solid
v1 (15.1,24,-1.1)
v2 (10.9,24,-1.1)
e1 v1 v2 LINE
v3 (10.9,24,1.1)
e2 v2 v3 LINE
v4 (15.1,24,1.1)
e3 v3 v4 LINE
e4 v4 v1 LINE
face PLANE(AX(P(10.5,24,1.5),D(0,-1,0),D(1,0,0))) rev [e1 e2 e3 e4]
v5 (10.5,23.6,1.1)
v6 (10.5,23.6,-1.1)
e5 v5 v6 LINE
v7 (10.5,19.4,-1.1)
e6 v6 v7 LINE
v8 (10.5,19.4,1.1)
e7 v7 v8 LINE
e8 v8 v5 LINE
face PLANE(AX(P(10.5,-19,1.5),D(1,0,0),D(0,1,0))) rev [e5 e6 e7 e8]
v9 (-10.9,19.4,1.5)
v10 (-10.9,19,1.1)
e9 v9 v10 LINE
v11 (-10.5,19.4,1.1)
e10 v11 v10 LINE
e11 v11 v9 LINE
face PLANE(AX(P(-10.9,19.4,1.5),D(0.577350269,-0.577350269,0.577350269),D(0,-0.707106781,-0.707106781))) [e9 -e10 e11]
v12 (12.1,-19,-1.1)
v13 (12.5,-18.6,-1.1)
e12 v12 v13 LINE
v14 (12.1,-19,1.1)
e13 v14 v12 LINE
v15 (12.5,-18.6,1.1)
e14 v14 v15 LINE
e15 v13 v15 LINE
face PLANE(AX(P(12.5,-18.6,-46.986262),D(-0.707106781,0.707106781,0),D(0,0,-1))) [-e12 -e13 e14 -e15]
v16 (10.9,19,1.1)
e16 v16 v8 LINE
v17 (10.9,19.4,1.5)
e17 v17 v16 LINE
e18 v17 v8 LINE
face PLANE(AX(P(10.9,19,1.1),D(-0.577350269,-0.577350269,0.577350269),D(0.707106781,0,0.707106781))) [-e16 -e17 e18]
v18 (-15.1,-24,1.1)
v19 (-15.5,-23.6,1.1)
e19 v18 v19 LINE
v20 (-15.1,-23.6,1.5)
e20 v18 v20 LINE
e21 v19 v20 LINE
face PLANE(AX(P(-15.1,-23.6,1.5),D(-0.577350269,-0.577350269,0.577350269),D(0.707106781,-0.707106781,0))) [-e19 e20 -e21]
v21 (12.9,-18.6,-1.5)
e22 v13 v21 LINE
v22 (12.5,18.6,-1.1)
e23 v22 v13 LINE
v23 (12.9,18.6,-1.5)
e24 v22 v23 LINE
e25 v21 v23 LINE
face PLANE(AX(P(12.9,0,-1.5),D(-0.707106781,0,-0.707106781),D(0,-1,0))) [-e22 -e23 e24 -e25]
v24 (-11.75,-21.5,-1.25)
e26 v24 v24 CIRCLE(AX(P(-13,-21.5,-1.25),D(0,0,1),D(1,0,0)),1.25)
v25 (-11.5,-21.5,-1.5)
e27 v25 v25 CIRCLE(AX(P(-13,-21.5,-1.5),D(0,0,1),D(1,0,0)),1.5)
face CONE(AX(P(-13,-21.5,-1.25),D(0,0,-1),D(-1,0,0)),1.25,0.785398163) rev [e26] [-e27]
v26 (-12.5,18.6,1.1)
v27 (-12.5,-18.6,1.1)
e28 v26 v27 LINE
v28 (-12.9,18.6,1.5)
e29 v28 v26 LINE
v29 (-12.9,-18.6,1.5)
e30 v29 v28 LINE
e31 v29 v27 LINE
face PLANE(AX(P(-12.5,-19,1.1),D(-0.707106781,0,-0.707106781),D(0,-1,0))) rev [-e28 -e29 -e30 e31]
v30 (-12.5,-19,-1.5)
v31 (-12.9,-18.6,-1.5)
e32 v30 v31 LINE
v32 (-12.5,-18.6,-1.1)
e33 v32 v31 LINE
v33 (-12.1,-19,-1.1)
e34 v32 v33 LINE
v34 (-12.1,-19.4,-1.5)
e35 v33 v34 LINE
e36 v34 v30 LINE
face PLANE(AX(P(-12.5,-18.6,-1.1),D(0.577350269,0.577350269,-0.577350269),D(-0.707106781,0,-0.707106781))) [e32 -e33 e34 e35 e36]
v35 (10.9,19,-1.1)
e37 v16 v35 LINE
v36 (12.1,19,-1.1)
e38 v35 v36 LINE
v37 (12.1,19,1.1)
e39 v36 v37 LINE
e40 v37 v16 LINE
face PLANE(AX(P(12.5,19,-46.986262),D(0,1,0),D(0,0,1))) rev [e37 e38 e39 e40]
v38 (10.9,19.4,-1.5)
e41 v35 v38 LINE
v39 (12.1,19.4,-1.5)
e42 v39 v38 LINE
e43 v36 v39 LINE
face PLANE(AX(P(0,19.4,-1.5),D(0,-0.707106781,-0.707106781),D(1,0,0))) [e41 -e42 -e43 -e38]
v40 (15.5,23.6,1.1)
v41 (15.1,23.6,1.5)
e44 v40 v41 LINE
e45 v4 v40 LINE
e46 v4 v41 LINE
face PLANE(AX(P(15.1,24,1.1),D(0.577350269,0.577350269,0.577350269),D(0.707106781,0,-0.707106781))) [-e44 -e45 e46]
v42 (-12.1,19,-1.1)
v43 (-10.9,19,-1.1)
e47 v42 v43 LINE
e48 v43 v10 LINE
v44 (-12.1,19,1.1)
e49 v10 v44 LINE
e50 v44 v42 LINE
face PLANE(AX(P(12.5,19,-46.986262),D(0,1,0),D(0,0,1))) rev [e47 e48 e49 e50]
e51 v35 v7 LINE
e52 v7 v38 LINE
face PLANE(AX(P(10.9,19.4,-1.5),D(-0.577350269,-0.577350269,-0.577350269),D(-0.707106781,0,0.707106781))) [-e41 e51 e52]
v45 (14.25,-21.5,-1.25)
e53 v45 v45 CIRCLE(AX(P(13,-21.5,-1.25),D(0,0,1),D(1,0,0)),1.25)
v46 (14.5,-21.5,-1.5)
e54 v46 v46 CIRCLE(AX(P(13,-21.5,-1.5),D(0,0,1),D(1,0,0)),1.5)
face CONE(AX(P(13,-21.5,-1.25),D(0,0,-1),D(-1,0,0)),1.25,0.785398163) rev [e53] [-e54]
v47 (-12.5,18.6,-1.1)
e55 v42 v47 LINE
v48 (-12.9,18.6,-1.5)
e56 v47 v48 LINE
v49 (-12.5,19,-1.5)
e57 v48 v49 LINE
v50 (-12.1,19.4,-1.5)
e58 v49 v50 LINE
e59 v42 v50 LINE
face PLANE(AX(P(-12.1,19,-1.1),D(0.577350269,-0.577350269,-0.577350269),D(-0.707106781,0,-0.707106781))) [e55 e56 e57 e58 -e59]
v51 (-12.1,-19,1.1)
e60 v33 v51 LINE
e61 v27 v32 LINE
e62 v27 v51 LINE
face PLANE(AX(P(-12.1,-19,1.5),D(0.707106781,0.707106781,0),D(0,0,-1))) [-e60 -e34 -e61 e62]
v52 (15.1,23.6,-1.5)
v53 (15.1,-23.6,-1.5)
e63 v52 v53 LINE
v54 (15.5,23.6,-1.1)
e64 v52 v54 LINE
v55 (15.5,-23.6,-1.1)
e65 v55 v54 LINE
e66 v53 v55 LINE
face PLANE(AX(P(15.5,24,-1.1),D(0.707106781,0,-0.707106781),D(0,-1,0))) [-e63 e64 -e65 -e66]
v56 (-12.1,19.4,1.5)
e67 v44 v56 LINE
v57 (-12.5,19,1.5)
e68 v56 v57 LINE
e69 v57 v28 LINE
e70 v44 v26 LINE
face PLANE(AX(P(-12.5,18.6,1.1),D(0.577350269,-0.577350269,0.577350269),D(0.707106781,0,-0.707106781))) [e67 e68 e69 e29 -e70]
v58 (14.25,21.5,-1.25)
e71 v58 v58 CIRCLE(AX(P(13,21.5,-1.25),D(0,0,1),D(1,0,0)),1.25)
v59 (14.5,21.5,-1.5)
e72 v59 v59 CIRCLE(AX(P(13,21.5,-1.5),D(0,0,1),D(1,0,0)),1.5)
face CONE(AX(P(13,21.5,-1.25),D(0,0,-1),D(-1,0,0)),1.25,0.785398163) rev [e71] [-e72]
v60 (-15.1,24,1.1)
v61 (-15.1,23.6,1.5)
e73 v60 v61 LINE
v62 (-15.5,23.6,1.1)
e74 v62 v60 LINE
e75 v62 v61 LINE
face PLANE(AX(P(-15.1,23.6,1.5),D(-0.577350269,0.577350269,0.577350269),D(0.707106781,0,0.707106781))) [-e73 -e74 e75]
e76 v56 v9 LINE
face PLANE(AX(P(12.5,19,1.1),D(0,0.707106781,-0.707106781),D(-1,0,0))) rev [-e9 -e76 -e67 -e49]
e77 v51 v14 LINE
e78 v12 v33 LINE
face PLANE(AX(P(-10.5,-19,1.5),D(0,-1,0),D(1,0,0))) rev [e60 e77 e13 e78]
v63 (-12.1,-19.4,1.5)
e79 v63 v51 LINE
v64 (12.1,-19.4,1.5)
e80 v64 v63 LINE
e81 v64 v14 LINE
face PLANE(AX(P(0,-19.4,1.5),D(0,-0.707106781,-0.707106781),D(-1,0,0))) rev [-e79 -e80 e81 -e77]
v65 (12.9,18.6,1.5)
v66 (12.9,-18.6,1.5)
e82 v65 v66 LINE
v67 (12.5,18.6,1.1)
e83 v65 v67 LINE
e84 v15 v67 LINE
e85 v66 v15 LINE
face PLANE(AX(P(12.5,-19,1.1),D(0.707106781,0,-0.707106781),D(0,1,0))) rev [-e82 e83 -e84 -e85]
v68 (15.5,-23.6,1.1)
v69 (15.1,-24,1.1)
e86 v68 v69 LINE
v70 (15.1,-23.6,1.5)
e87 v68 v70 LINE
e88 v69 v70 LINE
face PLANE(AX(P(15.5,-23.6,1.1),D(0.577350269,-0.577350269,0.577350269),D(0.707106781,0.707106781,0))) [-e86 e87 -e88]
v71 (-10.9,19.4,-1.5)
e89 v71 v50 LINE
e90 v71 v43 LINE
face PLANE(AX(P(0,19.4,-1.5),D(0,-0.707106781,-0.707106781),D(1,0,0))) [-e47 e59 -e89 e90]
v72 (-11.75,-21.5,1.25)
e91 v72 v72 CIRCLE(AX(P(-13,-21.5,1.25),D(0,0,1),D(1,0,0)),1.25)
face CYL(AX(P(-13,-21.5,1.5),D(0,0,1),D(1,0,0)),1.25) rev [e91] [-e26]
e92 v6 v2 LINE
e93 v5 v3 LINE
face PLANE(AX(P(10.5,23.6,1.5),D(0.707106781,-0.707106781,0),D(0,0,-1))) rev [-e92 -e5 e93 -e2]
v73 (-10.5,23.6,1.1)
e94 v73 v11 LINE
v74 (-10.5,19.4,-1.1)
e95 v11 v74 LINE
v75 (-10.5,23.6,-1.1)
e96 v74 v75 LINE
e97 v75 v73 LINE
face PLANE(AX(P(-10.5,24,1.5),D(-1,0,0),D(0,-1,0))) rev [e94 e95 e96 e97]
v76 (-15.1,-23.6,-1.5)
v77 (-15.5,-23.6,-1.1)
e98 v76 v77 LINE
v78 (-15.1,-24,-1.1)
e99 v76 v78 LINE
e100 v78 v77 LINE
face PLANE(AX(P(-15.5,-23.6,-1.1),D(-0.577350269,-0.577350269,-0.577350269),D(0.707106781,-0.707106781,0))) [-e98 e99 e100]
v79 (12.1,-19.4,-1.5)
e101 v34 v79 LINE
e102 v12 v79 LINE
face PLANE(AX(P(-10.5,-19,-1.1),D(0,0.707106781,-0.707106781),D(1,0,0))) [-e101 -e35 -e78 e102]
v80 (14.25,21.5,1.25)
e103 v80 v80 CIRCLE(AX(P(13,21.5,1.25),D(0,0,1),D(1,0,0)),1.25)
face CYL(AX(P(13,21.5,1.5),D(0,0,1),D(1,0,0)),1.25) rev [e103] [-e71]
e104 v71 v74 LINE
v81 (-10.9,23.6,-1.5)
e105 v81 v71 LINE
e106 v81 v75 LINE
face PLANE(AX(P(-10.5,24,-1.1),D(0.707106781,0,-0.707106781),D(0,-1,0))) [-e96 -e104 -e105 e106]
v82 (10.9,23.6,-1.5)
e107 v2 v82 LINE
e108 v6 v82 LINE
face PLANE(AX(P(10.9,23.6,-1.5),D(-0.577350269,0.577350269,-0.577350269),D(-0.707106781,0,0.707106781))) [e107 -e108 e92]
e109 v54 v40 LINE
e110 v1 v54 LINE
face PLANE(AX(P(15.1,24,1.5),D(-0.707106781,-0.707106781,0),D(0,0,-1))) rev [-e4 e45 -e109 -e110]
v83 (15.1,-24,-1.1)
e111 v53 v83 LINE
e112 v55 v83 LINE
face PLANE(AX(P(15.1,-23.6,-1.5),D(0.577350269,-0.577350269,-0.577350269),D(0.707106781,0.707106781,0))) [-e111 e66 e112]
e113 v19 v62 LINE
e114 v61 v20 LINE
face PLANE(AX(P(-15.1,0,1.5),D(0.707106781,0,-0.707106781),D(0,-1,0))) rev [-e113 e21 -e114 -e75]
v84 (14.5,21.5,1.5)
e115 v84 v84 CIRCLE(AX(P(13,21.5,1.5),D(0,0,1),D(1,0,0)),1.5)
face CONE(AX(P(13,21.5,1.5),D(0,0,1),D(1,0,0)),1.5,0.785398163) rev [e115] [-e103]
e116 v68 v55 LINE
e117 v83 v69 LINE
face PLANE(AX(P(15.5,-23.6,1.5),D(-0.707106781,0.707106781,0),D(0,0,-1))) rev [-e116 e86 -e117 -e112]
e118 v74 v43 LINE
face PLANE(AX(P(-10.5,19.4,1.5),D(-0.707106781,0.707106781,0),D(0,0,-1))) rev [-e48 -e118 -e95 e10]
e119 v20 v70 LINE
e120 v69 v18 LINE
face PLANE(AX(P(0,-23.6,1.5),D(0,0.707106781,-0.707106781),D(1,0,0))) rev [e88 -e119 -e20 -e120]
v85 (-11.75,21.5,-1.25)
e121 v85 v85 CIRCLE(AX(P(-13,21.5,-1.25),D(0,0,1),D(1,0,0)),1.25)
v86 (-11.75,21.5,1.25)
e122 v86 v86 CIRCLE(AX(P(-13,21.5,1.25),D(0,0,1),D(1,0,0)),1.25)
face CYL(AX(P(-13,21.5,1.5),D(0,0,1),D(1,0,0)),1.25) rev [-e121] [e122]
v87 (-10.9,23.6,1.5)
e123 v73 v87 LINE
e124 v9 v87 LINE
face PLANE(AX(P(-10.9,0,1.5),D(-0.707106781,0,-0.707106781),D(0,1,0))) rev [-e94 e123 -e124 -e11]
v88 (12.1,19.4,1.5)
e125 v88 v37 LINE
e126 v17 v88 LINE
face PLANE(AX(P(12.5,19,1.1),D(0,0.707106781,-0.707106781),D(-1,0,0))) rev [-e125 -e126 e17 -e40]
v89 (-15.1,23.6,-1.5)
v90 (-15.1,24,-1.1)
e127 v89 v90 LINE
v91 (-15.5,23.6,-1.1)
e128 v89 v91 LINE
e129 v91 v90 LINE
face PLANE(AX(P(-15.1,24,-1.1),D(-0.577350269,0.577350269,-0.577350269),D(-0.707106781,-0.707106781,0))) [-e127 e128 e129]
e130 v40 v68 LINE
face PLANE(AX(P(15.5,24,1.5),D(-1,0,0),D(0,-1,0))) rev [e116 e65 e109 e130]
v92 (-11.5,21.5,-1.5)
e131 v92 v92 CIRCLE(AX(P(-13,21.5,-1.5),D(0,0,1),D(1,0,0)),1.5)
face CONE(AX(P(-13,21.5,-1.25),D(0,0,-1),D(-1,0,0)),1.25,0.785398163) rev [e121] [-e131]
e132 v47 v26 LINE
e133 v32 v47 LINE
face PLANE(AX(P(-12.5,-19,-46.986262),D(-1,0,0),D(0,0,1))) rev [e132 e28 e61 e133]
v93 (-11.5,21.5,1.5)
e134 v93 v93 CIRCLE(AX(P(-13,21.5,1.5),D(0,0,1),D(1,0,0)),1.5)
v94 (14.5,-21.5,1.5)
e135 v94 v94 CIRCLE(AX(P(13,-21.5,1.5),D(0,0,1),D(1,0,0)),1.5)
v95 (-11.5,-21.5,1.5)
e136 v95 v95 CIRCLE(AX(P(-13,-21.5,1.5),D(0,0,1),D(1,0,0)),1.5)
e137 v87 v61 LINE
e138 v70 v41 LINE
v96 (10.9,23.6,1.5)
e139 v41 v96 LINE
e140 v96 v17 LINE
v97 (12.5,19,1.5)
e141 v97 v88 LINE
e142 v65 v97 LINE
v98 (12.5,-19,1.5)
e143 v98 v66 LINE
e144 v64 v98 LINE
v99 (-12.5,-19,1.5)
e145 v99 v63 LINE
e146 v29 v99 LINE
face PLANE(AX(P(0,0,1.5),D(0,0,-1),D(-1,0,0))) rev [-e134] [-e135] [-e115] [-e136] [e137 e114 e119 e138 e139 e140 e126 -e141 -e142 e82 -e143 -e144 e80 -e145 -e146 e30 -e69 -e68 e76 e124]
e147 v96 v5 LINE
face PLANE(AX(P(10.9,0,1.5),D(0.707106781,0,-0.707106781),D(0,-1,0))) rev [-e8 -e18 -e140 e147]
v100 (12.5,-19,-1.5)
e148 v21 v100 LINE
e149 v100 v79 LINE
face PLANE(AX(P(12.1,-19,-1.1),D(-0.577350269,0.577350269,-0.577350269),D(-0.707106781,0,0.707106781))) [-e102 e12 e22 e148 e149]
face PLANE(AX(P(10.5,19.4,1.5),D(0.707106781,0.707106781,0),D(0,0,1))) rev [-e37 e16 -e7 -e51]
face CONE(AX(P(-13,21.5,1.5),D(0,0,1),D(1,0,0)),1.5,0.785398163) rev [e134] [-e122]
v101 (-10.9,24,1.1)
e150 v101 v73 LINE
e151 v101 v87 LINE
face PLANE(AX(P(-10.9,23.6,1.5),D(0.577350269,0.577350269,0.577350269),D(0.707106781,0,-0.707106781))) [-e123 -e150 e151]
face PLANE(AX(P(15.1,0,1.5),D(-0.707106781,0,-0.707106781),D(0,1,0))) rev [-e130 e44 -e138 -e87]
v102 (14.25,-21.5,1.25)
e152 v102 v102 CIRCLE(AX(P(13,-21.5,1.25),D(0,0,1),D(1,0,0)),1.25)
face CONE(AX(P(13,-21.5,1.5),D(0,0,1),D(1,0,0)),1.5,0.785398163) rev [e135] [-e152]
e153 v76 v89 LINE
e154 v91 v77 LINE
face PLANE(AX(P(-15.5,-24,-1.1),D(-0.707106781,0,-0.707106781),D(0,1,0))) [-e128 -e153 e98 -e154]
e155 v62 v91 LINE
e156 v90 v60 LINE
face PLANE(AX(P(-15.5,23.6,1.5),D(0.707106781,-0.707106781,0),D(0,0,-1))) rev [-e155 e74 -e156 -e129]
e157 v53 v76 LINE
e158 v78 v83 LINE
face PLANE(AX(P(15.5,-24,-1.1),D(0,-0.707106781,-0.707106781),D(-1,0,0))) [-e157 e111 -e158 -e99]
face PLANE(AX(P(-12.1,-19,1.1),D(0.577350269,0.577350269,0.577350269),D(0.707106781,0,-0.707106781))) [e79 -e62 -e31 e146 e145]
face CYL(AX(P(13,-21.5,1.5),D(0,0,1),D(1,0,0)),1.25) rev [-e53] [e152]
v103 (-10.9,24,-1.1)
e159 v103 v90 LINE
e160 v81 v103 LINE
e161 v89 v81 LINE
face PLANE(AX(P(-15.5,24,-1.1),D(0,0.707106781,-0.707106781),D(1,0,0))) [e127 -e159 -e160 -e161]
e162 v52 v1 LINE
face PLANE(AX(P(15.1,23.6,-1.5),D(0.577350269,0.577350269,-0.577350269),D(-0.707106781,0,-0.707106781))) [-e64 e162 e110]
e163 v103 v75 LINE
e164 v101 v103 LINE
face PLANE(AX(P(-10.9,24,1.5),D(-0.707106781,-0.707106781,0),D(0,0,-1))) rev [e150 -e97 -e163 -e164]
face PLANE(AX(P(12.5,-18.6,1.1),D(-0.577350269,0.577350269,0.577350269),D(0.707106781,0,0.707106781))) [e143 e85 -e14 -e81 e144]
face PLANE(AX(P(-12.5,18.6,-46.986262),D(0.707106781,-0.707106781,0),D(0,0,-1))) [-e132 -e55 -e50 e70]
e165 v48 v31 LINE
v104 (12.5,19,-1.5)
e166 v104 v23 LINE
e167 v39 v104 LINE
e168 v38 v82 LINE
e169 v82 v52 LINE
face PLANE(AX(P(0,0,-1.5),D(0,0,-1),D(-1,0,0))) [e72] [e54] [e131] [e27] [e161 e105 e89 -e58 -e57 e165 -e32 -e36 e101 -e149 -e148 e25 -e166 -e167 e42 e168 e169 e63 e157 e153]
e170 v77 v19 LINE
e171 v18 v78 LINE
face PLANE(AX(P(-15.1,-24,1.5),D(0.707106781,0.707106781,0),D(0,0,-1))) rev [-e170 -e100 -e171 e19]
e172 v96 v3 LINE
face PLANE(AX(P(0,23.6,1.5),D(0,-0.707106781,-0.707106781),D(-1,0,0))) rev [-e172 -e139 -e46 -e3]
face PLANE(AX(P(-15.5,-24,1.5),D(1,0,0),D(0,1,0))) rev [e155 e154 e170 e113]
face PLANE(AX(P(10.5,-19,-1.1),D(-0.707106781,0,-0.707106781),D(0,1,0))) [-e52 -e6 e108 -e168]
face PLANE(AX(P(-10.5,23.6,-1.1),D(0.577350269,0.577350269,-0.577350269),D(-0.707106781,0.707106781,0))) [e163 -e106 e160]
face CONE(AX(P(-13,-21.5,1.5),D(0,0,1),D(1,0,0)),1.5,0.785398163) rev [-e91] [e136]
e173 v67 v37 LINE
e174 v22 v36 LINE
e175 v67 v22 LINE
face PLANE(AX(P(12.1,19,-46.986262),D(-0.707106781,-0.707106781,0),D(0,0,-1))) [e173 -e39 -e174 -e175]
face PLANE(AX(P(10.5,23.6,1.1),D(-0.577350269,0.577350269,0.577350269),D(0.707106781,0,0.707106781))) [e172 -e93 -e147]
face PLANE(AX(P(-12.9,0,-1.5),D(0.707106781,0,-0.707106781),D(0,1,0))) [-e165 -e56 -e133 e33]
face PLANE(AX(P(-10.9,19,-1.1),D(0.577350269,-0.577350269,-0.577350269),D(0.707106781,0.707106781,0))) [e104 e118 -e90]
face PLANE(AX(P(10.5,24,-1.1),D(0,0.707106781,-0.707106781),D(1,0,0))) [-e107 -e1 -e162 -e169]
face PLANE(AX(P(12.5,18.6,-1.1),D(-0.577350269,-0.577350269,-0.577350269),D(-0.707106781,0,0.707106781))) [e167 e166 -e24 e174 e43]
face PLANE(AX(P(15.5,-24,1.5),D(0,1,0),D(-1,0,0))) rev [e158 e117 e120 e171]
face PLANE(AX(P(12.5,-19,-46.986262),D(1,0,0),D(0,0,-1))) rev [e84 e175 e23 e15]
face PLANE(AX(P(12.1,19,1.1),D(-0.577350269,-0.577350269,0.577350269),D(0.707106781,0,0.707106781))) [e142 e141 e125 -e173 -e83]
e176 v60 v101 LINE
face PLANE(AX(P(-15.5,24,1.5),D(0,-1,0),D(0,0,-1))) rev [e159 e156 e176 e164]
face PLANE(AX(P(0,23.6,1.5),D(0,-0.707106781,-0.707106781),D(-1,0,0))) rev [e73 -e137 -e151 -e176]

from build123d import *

# Parameters (mm, degrees)
AUFSATZ_LINEAR_AUSTRAGEN1_DEPTH           = 1.5
F_2_5_2_5_DURCHMESSER_BOHRUNG1_AT_2_COUNT = 2
F_2_5_2_5_DURCHMESSER_BOHRUNG1_AT_2_PITCH = 25.124689053
F_2_5_2_5_DURCHMESSER_BOHRUNG1_AT_3_COUNT = 2
F_2_5_2_5_DURCHMESSER_BOHRUNG1_AT_3_PITCH = 25.124689053
F_2_5_2_5_DURCHMESSER_BOHRUNG1_AT_4_COUNT = 2
F_2_5_2_5_DURCHMESSER_BOHRUNG1_AT_4_PITCH = 25.124689053
F_2_5_2_5_DURCHMESSER_BOHRUNG1_AT_5_COUNT = 2
F_2_5_2_5_DURCHMESSER_BOHRUNG1_AT_5_PITCH = 25.124689053
SKIZZE4_W                                 = 25
SKIZZE4_H                                 = 38
SCHNITT_LINEAR_AUSTRAGEN1_DEPTH           = 3
FASE1_SIZE                                = 0.4


with BuildPart() as part:
    # Skizze1 → Aufsatz-Linear austragen1 (new, symmetric)
    with BuildSketch(Plane(origin=(0, 0, 0), x_dir=(0, 1, 0), z_dir=(0, 0, 1))):
        Polygon((-24, 15.5), (24, 15.5), (24, 10.5), (-19, 10.5), (-19, -10.5), (24, -10.5), (24, -15.5), (-24, -15.5), align=None)
    extrude(amount=AUFSATZ_LINEAR_AUSTRAGEN1_DEPTH, both=True)

    # Skizze3 → Ø2.5 (2.5) Durchmesser Bohrung1 (revolve, cut)
    with BuildSketch(Plane(origin=(0, 0, 1.5), x_dir=(0, -1, 0), z_dir=(1, 0, 0))):
        Polygon((0, 0), (0, 3), (1.5, 3), (1.25, 2.75), (1.25, 0.25), (1.5, 0), align=None)
    f_2_5_2_5_durchmesser_bohrung1 = revolve(axis=Axis((0, 0, 7.85), (0, 0, -1)), mode=Mode.SUBTRACT)

    # Ø2.5 (2.5) Durchmesser Bohrung1 at 2: Ø2.5 (2.5) Durchmesser Bohrung1 ×2
    with Locations(*[Vector(0.5174193389091943, 0.8557319835805908, 0) * (i * F_2_5_2_5_DURCHMESSER_BOHRUNG1_AT_2_PITCH) for i in range(1, F_2_5_2_5_DURCHMESSER_BOHRUNG1_AT_2_COUNT)]):
        add(f_2_5_2_5_durchmesser_bohrung1, mode=Mode.SUBTRACT)

    # Ø2.5 (2.5) Durchmesser Bohrung1 at 3: Ø2.5 (2.5) Durchmesser Bohrung1 ×2
    with Locations(*[Vector(-0.5174193389091943, -0.8557319835805908, 0) * (i * F_2_5_2_5_DURCHMESSER_BOHRUNG1_AT_3_PITCH) for i in range(1, F_2_5_2_5_DURCHMESSER_BOHRUNG1_AT_3_COUNT)]):
        add(f_2_5_2_5_durchmesser_bohrung1, mode=Mode.SUBTRACT)

    # Ø2.5 (2.5) Durchmesser Bohrung1 at 4: Ø2.5 (2.5) Durchmesser Bohrung1 ×2
    with Locations(*[Vector(0.5174193389091946, -0.8557319835805907, 0) * (i * F_2_5_2_5_DURCHMESSER_BOHRUNG1_AT_4_PITCH) for i in range(1, F_2_5_2_5_DURCHMESSER_BOHRUNG1_AT_4_COUNT)]):
        add(f_2_5_2_5_durchmesser_bohrung1, mode=Mode.SUBTRACT)

    # Ø2.5 (2.5) Durchmesser Bohrung1 at 5: Ø2.5 (2.5) Durchmesser Bohrung1 ×2
    with Locations(*[Vector(-0.5174193389091944, 0.8557319835805907, 0) * (i * F_2_5_2_5_DURCHMESSER_BOHRUNG1_AT_5_PITCH) for i in range(1, F_2_5_2_5_DURCHMESSER_BOHRUNG1_AT_5_COUNT)]):
        add(f_2_5_2_5_durchmesser_bohrung1, mode=Mode.SUBTRACT)

    # Skizze4 → Schnitt-Linear austragen1 (cut)
    with BuildSketch(Plane.XY.offset(1.5)):
        Rectangle(SKIZZE4_W, SKIZZE4_H)
    extrude(amount=-SCHNITT_LINEAR_AUSTRAGEN1_DEPTH, mode=Mode.SUBTRACT)

    # Fase1
    fase1_edges = [part.edges().sort_by_distance(p)[0] for p in [
        (10.5, 21.5, -1.5),
        (13, 24, -1.5),
        (15.5, 0, -1.5),
        (0, -24, -1.5),
        (13, 24, 1.5),
        (-15.5, -24, 0),
        (-15.5, 24, 0),
        (-10.5, 24, 0),
        (10.5, 24, 0),
        (15.5, 24, 0),
        (15.5, -24, 0),
        (10.5, 21.5, 1.5),
        (0, -19, 1.5),
        (-13, 24, 1.5),
        (-15.5, 0, 1.5),
        (0, -24, 1.5),
        (-10.5, 21.5, -1.5),
        (-11.5, 19, -1.5),
        (-10.5, 21.5, 1.5),
        (11.5, 19, 1.5),
        (12.5, 0, 1.5),
        (-11.5, 19, 1.5),
        (-12.5, 0, 1.5),
        (12.5, -19, 0),
        (11.5, 19, -1.5),
        (10.5, 19, 0),
        (-10.5, 19, 0),
        (-12.5, 19, 0),
        (12.5, 0, -1.5),
        (12.5, 19, 0),
        (-12.5, 0, -1.5),
        (-12.5, -19, 0),
        (-15.5, 0, -1.5),
        (15.5, 0, 1.5),
        (-13, 24, -1.5),
        (0, -19, -1.5),
    ]]
    chamfer(fase1_edges, length=FASE1_SIZE)


solid = part.part
